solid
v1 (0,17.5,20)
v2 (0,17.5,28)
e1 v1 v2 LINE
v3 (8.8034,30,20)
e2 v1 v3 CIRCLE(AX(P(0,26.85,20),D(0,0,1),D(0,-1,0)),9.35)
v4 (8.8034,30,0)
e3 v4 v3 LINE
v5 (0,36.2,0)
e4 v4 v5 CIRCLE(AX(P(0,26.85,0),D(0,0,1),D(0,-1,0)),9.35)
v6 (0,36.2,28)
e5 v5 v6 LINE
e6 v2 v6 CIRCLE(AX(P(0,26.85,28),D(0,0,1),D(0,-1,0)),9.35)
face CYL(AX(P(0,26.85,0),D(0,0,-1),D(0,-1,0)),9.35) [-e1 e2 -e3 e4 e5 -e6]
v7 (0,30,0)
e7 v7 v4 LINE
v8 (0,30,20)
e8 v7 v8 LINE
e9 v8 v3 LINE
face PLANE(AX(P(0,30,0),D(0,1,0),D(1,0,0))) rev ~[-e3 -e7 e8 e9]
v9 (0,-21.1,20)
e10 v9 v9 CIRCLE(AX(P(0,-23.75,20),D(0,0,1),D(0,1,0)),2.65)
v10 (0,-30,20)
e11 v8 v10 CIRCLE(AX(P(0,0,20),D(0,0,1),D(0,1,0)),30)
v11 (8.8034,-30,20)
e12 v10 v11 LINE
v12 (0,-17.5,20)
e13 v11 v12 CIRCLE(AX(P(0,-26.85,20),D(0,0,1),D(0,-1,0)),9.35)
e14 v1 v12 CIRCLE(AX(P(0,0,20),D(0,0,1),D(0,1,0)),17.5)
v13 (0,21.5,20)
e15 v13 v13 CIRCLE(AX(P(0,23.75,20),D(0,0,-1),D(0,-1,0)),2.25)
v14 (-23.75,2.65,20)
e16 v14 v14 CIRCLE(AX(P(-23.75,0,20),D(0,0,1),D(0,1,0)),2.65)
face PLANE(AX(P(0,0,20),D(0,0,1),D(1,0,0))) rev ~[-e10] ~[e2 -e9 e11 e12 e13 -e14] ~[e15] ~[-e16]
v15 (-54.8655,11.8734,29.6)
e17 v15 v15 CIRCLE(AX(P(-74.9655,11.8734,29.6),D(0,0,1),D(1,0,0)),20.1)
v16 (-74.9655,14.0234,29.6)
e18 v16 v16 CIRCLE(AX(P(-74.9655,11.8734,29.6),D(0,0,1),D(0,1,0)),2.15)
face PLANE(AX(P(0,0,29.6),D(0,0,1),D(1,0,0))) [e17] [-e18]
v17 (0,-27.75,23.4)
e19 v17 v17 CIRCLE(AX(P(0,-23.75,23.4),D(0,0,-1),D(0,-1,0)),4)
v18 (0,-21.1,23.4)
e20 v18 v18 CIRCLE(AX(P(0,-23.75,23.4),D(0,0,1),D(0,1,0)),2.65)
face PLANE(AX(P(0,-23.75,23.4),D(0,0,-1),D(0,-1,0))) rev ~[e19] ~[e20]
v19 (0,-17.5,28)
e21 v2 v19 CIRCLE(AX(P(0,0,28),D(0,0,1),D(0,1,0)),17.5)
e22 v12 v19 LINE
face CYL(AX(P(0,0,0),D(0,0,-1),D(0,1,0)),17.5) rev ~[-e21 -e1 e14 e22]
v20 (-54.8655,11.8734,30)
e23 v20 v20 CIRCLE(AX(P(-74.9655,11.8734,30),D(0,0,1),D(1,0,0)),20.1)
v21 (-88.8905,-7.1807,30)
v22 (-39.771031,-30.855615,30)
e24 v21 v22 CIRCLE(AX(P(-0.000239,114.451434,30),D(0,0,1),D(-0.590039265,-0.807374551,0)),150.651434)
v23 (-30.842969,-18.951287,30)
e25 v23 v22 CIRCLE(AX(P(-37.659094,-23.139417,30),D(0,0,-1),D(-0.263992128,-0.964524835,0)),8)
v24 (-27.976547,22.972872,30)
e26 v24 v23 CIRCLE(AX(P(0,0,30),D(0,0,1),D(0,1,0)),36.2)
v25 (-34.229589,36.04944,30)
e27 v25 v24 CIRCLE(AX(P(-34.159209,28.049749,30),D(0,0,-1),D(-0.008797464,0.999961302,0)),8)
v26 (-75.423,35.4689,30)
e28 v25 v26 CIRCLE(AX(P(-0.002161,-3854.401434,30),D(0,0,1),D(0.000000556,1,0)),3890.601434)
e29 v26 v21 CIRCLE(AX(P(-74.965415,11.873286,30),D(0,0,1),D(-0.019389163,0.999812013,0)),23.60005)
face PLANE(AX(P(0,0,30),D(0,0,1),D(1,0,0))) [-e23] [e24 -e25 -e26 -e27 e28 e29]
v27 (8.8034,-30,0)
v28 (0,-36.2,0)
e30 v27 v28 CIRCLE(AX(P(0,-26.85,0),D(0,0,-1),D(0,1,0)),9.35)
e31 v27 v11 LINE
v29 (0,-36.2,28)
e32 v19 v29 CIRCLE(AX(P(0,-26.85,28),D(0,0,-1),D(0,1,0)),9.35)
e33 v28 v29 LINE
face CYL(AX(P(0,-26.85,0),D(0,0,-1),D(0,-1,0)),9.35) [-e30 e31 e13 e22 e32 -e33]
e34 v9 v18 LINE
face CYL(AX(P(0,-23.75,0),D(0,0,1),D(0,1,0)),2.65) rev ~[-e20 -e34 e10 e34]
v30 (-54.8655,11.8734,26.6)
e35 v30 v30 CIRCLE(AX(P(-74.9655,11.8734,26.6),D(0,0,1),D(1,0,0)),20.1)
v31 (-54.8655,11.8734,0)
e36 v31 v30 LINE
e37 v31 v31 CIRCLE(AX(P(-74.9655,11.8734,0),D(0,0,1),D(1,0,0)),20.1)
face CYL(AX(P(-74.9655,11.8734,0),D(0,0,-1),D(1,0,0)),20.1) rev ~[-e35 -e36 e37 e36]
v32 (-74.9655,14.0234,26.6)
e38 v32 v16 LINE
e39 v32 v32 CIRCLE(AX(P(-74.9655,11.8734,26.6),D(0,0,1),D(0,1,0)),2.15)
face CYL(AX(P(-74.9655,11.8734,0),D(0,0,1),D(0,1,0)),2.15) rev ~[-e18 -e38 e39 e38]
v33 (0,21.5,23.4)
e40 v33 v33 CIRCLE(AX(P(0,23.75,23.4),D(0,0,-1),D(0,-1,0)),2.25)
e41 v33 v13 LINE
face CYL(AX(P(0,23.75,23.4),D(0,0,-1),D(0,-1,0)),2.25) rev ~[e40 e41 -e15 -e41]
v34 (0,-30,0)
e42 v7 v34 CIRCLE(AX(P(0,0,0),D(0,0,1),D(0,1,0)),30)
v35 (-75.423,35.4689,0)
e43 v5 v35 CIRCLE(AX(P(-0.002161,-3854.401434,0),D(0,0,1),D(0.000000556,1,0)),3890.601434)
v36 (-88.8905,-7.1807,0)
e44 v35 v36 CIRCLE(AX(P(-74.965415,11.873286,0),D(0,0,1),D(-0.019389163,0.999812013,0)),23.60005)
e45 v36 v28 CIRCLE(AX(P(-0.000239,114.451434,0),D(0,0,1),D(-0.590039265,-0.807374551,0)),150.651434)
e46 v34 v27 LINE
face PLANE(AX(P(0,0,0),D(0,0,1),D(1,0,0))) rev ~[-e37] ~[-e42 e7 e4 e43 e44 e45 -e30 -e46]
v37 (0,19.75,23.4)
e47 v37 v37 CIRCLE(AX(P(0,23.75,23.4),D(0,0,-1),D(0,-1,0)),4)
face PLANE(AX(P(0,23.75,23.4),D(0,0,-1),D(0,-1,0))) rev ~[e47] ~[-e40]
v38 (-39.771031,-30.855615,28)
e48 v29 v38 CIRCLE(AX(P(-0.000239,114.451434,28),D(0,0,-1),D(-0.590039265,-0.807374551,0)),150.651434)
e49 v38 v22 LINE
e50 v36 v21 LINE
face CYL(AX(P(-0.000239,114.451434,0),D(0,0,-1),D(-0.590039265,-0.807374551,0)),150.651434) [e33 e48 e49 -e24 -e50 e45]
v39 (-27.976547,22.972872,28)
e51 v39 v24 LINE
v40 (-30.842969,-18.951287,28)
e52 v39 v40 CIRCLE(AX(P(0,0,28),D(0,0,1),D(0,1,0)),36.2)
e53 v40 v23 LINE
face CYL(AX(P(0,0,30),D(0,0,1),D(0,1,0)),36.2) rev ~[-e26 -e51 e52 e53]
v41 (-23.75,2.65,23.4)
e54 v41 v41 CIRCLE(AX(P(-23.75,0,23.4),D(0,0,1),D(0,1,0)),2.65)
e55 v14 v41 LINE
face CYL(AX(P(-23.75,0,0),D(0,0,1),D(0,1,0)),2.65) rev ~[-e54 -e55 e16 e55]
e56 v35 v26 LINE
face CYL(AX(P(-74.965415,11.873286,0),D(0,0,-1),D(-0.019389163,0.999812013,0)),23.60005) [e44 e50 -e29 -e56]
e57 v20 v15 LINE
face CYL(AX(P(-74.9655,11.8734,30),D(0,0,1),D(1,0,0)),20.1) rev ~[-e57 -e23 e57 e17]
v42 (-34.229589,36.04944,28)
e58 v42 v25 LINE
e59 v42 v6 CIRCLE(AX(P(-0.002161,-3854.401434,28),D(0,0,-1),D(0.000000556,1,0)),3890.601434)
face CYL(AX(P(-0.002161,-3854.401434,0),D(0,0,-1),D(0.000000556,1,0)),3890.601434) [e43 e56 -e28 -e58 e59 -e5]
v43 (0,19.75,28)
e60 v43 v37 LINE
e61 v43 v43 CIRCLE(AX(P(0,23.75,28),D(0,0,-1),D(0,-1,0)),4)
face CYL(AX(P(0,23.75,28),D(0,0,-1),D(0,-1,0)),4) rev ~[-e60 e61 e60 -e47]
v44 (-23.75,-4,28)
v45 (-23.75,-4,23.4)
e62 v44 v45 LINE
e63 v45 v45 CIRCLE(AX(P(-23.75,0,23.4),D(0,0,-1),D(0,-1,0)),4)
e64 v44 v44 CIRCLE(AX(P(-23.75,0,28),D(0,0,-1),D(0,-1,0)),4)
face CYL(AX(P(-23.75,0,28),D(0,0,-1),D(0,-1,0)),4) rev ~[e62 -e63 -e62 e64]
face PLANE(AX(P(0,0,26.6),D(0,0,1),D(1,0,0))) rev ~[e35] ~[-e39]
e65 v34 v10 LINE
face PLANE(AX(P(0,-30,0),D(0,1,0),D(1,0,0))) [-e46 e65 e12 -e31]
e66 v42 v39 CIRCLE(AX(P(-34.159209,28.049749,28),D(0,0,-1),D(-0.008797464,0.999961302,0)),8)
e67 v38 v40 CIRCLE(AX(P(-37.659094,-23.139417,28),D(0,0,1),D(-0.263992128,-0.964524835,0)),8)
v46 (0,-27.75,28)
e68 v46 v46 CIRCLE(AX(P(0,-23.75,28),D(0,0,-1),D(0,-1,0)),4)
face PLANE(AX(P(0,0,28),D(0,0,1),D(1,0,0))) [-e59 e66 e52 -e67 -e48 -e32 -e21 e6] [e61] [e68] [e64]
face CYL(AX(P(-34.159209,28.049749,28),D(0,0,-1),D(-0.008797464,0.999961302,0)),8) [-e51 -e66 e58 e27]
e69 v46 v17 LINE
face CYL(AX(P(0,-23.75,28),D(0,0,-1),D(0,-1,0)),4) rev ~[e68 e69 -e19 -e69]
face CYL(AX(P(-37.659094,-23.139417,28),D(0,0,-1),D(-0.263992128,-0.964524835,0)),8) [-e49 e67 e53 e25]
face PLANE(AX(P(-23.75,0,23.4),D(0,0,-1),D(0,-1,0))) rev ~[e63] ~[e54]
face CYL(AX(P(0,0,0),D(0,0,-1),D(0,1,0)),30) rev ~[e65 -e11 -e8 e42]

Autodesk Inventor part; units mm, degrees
ref_plane "YZ Plane" through (0, 0, 0) normal (1, 0, 0) x (0, 1, 0)
ref_plane "XZ Plane" through (0, 0, 0) normal (0, 1, 0) x (-1, 0, 0)
ref_plane "XY Plane" through (0, 0, 0) normal (0, 0, 1) x (1, 0, 0)
sketch "Sketch1" plane through (0, 0, 0) normal (0, 0, 1) x (1, 0, 0)
  arc A0 (0, 30) -> (0, -30) centre (0, 0) ccw
  arc A1 (0, 17.5) -> (0, -17.5) centre (0, 0) ccw
  line L0 (0, 36.2) -> (0, -36.2) construction
  line L1 (0, 17.5) -> (0, 36.2) construction
  line L2 (0, -17.5) -> (0, -36.2) construction
  circle A2 centre (-74.9655, 11.8734) radius 20.1
  circle A3 centre (0, 0) radius 75.9 construction
  arc A4 (0, 23.75) -> (0, -23.75) centre (0, 0) ccw construction
  line L3 (0, -23.75) -> (0, 23.75) construction
  line L4 (0, 23.75) -> (0, 0) construction
  arc A5 (0, 17.5) -> (0, 36.2) centre (0, 26.85) ccw
  arc A6 (0, -36.2) -> (0, -17.5) centre (0, -26.85) ccw
  arc A7 (-75.423, 35.4689) -> (-88.8905, -7.1807) centre (-74.9655, 11.8734) ccw
  line L5 (0, 30) -> (8.8034, 30)
  line L6 (0, -30) -> (8.8034, -30)
  arc A8 (0, 36.2) -> (0, -36.2) centre (0, 0) ccw
  circle A9 centre (-74.9655, 11.8734) radius 23.6 construction
  arc A10 (0, 36.2) -> (-75.423, 35.4689) centre (0, -3854.8474) ccw
  arc A11 (-88.8905, -7.1807) -> (0, -36.2) centre (0, 114.4519) ccw
  line L7 (0, 0) -> (-75.9, 0) construction
  line L8 (-74.9655, 11.8734) -> (0, 0) construction
  line L9 (0, 0) -> (-75.0466, 11.3497) construction
  point P0 (-23.75, 0)
  dimension "d0" = 60
  dimension "d1" = 35
  dimension "d2" = 75.9
  dimension "d5" = 40.2
  dimension "FixHole_Rad" = 23.75
  dimension "d25" = 72.4
  dimension "d52" = 3.5
  dimension "d63" = 0
  dimension "d72" = 9
  dimension "d73" = 8.6
extrude "Extrusion1" add sketch "Sketch1" along normal blind 30 contours L5 A5 A1 A6 L6 A0 | A0 L6 A6 A8 A5 L5 | A8 A11 A7 A10 | A2
extrude "Extrusion3" cut sketch "Sketch1" along normal blind 20 contours L5 A5 A1 A6 L6 A0
extrude "Extrusion5" cut sketch "Sketch1" along normal blind 26.6 contours A2
extrude "Extrusion6" cut sketch "Sketch1" against normal blind 0.4 from surface at 30 contours A2
extrude "Extrusion8" cut sketch "Sketch1" against normal blind 2 from surface at 30 contours L5 A5 A1 A6 L6 A0 | A0 L6 A6 A8 A5 L5
sketch "Sketch2" plane through (0, 0, 28) normal (0, 0, 1) x (1, 0, 0)
  point P0 (0, 0)
  point P1 (0, -23.75)
  point P2 (-23.75, 0)
  point P3 (0, 23.75)
hole "Hole2" at (0, -23.75, 28) at (-23.75, 0, 28) at (0, 23.75, 28) direction (0, 0, -1) diameter 4.5 end through all counterbore diameter 8 counterbore depth 4.6 clearance for "Socket Head Cap Screw ISO 4762" size "M4" standard "ISO"
fillet "Fillet1" radius 8 3 edges at (-88.8905, -7.1807, 15) (0, 36.2, 29) (0, -36.2, 29)
hole "Hole3" at (0, -23.75, 0) at (-23.75, 0, 0) direction (0, 0, 1) diameter 5.3 end through all clearance for "Countersunk Flat Head Screw DIN EN ISO 2009" size "M5" standard "DIN"
hole "Hole4" at (-74.9655, 11.8734, 0) direction (0, 0, 1) diameter 4.3 end through all clearance for "Countersunk Flat Head Screw DIN EN ISO 2009" size "M4" standard "DIN"
equation "\"d0\" = SJ_D_out"
equation "\"d12\" = d11"
equation "\"d13\" = d12"
equation "\"StabelizerExtrusion\" = 8"
equation "\"SJ_D_out\" = 60"
equation "\"d11\" = 3.8"
properties part number "CounterWeightFixation_oldVersion" material "PAEK Plastic"
